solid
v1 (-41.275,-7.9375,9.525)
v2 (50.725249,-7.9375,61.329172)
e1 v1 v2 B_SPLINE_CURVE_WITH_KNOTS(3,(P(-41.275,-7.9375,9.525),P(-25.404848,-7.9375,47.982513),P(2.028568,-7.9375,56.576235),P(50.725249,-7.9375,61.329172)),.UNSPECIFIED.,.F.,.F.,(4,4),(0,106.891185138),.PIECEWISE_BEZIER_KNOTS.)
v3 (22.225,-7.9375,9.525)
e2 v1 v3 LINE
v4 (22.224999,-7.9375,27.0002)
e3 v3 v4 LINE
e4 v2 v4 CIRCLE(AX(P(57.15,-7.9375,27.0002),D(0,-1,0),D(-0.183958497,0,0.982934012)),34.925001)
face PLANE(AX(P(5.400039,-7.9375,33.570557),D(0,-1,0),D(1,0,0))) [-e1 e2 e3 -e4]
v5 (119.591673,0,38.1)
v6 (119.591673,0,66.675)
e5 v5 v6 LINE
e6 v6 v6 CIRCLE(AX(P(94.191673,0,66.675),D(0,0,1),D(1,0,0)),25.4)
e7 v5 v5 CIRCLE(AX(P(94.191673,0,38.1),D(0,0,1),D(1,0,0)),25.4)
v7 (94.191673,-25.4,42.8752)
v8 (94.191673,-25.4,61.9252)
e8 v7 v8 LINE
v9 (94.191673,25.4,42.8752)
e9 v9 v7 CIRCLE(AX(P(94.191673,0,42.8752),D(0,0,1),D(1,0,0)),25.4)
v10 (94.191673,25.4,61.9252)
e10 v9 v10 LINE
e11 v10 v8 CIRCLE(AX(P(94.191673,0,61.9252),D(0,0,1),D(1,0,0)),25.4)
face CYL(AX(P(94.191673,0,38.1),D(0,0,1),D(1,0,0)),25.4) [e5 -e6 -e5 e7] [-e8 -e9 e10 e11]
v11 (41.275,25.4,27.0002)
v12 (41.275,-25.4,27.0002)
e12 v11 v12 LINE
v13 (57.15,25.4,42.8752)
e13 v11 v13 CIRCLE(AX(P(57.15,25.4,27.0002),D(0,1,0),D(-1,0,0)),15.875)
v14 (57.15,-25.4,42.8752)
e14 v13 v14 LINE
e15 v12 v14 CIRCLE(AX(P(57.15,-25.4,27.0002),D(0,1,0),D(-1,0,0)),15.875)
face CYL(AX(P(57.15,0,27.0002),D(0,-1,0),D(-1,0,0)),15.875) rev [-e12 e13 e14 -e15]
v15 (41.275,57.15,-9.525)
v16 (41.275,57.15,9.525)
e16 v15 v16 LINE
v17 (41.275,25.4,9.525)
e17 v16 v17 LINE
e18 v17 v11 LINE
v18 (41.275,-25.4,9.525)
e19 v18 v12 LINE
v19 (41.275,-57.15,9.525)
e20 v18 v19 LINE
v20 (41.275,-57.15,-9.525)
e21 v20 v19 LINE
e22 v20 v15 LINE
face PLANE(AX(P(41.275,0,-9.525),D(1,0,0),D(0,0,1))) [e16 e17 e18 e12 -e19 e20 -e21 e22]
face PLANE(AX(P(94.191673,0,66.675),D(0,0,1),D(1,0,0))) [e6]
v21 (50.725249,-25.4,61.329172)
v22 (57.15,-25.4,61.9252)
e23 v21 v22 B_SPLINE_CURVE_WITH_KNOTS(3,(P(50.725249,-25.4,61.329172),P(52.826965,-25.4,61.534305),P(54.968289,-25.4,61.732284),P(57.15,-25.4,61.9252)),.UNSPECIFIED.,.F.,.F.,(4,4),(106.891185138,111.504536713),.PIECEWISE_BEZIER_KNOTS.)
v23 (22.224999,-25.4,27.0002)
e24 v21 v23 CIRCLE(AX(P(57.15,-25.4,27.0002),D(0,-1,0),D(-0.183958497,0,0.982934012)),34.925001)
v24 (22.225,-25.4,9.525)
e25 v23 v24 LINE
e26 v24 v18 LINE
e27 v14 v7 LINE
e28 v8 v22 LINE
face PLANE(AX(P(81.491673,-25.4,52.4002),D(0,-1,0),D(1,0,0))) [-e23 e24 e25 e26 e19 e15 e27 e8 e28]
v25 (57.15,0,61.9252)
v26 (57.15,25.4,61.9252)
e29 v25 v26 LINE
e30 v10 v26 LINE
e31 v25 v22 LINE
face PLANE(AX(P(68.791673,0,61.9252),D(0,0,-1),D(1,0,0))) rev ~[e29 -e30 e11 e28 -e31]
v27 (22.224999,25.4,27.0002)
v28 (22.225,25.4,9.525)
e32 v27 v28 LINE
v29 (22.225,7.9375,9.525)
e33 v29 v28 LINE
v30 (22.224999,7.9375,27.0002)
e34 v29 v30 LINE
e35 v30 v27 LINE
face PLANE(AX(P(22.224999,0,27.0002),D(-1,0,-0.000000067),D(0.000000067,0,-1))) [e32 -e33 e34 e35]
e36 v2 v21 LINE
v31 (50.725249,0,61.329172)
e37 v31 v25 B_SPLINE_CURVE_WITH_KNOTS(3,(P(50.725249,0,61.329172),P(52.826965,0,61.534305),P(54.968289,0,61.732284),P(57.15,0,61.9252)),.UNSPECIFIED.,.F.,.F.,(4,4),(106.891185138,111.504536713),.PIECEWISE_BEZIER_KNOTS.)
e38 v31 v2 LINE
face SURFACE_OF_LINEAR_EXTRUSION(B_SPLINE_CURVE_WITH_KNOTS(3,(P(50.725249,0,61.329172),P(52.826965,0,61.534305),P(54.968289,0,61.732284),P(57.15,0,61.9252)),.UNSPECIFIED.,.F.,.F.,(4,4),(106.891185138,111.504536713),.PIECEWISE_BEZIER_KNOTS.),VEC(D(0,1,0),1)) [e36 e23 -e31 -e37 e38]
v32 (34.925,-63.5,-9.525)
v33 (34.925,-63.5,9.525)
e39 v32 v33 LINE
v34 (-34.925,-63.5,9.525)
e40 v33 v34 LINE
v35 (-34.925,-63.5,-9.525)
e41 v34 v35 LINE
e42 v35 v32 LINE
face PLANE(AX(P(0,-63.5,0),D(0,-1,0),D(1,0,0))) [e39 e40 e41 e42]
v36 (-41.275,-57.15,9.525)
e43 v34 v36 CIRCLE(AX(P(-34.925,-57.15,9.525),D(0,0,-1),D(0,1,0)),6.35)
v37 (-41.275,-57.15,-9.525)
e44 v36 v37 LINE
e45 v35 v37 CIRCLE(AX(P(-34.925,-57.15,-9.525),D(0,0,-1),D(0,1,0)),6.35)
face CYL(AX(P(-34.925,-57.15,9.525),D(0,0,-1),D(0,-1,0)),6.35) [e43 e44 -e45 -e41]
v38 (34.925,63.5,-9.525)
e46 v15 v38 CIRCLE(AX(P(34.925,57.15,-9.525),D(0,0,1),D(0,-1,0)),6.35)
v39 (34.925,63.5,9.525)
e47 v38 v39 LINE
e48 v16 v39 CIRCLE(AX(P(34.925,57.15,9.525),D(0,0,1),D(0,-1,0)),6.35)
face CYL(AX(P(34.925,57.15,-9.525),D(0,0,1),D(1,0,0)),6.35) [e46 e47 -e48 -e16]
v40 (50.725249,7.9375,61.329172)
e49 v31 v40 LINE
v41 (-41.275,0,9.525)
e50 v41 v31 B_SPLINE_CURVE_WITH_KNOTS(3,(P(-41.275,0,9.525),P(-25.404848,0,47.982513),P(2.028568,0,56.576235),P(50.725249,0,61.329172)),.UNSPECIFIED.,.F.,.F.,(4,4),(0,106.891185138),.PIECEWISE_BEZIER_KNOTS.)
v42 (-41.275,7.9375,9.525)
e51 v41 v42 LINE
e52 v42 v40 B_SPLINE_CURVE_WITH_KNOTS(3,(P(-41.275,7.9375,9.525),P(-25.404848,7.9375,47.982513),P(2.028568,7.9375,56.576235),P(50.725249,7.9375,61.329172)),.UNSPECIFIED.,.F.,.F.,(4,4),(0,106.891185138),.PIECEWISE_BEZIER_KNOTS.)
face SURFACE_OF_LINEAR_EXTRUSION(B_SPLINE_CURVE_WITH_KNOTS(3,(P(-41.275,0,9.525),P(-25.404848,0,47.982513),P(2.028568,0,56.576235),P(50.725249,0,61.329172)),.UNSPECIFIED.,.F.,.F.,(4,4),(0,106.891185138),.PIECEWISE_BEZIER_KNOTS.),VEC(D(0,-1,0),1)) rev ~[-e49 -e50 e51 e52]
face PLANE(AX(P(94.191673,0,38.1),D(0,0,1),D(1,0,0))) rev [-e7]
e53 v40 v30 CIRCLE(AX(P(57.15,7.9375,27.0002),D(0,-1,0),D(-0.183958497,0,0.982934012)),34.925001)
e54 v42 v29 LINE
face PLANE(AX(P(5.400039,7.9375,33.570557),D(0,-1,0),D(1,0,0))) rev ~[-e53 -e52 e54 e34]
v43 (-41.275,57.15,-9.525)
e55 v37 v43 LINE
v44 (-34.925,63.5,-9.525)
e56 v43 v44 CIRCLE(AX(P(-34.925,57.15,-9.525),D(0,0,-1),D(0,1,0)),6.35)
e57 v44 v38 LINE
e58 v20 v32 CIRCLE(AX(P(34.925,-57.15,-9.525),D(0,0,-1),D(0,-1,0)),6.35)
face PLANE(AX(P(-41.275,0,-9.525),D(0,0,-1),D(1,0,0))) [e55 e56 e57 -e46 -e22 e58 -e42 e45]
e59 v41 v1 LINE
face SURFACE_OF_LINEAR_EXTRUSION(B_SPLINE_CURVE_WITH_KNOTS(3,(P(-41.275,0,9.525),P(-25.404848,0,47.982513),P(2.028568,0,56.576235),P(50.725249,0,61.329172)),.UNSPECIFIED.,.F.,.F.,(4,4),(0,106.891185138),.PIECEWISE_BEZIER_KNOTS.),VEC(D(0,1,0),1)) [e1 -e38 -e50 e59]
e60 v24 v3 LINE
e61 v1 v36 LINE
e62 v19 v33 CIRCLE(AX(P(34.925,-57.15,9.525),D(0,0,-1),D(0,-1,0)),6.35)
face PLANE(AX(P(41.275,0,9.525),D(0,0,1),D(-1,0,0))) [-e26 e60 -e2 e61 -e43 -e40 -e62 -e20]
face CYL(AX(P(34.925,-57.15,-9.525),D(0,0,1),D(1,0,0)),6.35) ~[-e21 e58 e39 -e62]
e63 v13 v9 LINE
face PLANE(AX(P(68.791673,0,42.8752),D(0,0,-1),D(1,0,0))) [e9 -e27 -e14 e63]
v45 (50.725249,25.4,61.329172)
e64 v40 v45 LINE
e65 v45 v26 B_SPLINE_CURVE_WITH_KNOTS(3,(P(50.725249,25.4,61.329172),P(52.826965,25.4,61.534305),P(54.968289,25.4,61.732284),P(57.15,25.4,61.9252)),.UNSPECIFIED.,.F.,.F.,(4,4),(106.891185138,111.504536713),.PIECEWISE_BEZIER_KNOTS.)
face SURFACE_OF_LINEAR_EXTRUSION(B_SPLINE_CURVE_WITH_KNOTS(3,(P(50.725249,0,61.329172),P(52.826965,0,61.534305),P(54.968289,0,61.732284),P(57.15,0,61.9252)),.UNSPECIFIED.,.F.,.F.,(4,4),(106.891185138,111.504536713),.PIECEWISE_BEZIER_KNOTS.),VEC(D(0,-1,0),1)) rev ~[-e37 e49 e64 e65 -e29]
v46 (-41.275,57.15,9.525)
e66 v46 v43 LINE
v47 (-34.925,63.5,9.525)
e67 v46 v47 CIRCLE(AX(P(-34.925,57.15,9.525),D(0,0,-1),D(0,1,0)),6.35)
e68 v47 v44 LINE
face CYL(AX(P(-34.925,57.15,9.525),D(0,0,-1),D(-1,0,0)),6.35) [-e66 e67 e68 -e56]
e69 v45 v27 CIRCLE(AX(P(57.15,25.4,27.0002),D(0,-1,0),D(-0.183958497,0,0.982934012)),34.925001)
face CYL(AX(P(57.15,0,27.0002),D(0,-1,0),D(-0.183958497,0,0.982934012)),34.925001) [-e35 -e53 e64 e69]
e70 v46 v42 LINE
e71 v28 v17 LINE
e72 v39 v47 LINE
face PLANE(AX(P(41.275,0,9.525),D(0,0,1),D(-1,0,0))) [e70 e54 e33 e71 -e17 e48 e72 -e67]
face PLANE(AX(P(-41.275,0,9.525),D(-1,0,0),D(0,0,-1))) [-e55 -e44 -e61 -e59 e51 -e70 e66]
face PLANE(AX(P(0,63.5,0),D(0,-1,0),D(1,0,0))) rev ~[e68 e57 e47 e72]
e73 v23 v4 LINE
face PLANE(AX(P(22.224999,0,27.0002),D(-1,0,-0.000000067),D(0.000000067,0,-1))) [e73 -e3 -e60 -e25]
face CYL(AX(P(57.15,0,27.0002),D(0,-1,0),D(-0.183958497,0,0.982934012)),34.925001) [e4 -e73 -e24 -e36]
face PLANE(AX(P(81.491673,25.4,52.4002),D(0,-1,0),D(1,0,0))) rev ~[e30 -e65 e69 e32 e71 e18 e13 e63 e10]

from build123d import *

# Parameters (mm, degrees)
F1_DEPTH = 63.5
F2_DEPTH = 25.4
F3_DEPTH = 7.9375
F0_W     = 25.4
F0_H     = 19.05
F4_DEPTH = 25.4
F6_R     = 6.35


# Not quite as in the source:
# - ends of sketch curves that miss each other by under 0.0002 mm in the source are joined
# - a feature names something its author has since deleted; it is built from what else it names


with BuildPart() as f1:
    # F0 (on Front) → F1 (new body, symmetric)
    with BuildSketch(Plane.XZ):
        Polygon((41.275, -9.525), (41.275, 9.525), (22.225, 9.525), (-41.275, 9.525), (-41.275, -9.525), align=None)
    extrude(amount=F1_DEPTH, both=True)

    # F0 (on Front) → F2 (join, symmetric)
    with BuildSketch(Plane.XZ):
        with BuildLine():
            Line((22.225, 9.525), (41.275, 9.525))
            Line((41.275, 9.525), (41.275, 27.0002))
            ThreePointArc((41.275, 27.0002), (45.9246798487, 38.2255201513), (57.15, 42.8752))
            Line((57.15, 42.8752), (68.7916731741, 42.8752))
            Line((68.7916731741, 42.8752), (68.7916731741, 61.9252))
            Line((68.7916731741, 61.9252), (57.15, 61.9252))
            add(Edge.make_bspline(
                [(50.7252492869, 61.329171511), (52.8269652502, 61.534305037), (54.9682888804, 61.732284225), (57.15, 61.9252)],
                knots=[106.8911851376, 106.8911851376, 106.8911851376, 106.8911851376, 111.5045367133, 111.5045367133, 111.5045367133, 111.5045367133], degree=3))
            ThreePointArc((50.7252492869, 61.329171511), (30.2786385449, 49.3090690945), (22.22499883, 27.0002))
            Line((22.22499883, 27.0002), (22.225, 9.525))
        make_face()
    extrude(amount=F2_DEPTH, both=True)

    # F0 (on Front) → F3 (join, symmetric)
    with BuildSketch(Plane.XZ):
        with BuildLine():
            Line((-41.275, 9.525), (22.225, 9.525))
            Line((22.225, 9.525), (22.225, 27.0002))
            ThreePointArc((22.225, 27.0002), (30.2786385449, 49.3090690945), (50.7252492869, 61.329171511))
            add(Edge.make_bspline(
                [(-41.275, 9.525), (-25.4048483065, 47.9825129098), (2.0285682627, 56.5762353117), (50.7252492869, 61.329171511)],
                knots=[0, 0, 0, 0, 106.8911851376, 106.8911851376, 106.8911851376, 106.8911851376], degree=3))
        make_face()
    extrude(amount=F3_DEPTH, both=True)

    # F0 (on Front) → F4 (join, symmetric)
    with BuildSketch(Plane.XZ):
        with Locations((81.4916731741, 52.4002)):
            Rectangle(F0_W, F0_H)
    extrude(amount=F4_DEPTH, both=True)

    # F0 (on Front) → F5 (revolve)
    with BuildSketch(Plane.XZ):
        Polygon((94.1916731741, 61.9252), (94.1916731741, 42.8752), (94.1916731741, 38.1), (119.5916731741, 38.1), (119.5916731741, 66.675), (94.1916731741, 66.675), align=None)
    revolve(axis=Axis((94.1916731741, 0, 52.3875), (0, 0, 1)))

    # F6
    f6_edges = [f1.edges().sort_by_distance(p)[0] for p in [
        (41.275, -63.5, 0),
        (-41.275, -63.5, 0),
        (41.275, 63.5, 0),
        (-41.275, 63.5, 0),
    ]]
    fillet(f6_edges, radius=F6_R)


solid = f1.part
